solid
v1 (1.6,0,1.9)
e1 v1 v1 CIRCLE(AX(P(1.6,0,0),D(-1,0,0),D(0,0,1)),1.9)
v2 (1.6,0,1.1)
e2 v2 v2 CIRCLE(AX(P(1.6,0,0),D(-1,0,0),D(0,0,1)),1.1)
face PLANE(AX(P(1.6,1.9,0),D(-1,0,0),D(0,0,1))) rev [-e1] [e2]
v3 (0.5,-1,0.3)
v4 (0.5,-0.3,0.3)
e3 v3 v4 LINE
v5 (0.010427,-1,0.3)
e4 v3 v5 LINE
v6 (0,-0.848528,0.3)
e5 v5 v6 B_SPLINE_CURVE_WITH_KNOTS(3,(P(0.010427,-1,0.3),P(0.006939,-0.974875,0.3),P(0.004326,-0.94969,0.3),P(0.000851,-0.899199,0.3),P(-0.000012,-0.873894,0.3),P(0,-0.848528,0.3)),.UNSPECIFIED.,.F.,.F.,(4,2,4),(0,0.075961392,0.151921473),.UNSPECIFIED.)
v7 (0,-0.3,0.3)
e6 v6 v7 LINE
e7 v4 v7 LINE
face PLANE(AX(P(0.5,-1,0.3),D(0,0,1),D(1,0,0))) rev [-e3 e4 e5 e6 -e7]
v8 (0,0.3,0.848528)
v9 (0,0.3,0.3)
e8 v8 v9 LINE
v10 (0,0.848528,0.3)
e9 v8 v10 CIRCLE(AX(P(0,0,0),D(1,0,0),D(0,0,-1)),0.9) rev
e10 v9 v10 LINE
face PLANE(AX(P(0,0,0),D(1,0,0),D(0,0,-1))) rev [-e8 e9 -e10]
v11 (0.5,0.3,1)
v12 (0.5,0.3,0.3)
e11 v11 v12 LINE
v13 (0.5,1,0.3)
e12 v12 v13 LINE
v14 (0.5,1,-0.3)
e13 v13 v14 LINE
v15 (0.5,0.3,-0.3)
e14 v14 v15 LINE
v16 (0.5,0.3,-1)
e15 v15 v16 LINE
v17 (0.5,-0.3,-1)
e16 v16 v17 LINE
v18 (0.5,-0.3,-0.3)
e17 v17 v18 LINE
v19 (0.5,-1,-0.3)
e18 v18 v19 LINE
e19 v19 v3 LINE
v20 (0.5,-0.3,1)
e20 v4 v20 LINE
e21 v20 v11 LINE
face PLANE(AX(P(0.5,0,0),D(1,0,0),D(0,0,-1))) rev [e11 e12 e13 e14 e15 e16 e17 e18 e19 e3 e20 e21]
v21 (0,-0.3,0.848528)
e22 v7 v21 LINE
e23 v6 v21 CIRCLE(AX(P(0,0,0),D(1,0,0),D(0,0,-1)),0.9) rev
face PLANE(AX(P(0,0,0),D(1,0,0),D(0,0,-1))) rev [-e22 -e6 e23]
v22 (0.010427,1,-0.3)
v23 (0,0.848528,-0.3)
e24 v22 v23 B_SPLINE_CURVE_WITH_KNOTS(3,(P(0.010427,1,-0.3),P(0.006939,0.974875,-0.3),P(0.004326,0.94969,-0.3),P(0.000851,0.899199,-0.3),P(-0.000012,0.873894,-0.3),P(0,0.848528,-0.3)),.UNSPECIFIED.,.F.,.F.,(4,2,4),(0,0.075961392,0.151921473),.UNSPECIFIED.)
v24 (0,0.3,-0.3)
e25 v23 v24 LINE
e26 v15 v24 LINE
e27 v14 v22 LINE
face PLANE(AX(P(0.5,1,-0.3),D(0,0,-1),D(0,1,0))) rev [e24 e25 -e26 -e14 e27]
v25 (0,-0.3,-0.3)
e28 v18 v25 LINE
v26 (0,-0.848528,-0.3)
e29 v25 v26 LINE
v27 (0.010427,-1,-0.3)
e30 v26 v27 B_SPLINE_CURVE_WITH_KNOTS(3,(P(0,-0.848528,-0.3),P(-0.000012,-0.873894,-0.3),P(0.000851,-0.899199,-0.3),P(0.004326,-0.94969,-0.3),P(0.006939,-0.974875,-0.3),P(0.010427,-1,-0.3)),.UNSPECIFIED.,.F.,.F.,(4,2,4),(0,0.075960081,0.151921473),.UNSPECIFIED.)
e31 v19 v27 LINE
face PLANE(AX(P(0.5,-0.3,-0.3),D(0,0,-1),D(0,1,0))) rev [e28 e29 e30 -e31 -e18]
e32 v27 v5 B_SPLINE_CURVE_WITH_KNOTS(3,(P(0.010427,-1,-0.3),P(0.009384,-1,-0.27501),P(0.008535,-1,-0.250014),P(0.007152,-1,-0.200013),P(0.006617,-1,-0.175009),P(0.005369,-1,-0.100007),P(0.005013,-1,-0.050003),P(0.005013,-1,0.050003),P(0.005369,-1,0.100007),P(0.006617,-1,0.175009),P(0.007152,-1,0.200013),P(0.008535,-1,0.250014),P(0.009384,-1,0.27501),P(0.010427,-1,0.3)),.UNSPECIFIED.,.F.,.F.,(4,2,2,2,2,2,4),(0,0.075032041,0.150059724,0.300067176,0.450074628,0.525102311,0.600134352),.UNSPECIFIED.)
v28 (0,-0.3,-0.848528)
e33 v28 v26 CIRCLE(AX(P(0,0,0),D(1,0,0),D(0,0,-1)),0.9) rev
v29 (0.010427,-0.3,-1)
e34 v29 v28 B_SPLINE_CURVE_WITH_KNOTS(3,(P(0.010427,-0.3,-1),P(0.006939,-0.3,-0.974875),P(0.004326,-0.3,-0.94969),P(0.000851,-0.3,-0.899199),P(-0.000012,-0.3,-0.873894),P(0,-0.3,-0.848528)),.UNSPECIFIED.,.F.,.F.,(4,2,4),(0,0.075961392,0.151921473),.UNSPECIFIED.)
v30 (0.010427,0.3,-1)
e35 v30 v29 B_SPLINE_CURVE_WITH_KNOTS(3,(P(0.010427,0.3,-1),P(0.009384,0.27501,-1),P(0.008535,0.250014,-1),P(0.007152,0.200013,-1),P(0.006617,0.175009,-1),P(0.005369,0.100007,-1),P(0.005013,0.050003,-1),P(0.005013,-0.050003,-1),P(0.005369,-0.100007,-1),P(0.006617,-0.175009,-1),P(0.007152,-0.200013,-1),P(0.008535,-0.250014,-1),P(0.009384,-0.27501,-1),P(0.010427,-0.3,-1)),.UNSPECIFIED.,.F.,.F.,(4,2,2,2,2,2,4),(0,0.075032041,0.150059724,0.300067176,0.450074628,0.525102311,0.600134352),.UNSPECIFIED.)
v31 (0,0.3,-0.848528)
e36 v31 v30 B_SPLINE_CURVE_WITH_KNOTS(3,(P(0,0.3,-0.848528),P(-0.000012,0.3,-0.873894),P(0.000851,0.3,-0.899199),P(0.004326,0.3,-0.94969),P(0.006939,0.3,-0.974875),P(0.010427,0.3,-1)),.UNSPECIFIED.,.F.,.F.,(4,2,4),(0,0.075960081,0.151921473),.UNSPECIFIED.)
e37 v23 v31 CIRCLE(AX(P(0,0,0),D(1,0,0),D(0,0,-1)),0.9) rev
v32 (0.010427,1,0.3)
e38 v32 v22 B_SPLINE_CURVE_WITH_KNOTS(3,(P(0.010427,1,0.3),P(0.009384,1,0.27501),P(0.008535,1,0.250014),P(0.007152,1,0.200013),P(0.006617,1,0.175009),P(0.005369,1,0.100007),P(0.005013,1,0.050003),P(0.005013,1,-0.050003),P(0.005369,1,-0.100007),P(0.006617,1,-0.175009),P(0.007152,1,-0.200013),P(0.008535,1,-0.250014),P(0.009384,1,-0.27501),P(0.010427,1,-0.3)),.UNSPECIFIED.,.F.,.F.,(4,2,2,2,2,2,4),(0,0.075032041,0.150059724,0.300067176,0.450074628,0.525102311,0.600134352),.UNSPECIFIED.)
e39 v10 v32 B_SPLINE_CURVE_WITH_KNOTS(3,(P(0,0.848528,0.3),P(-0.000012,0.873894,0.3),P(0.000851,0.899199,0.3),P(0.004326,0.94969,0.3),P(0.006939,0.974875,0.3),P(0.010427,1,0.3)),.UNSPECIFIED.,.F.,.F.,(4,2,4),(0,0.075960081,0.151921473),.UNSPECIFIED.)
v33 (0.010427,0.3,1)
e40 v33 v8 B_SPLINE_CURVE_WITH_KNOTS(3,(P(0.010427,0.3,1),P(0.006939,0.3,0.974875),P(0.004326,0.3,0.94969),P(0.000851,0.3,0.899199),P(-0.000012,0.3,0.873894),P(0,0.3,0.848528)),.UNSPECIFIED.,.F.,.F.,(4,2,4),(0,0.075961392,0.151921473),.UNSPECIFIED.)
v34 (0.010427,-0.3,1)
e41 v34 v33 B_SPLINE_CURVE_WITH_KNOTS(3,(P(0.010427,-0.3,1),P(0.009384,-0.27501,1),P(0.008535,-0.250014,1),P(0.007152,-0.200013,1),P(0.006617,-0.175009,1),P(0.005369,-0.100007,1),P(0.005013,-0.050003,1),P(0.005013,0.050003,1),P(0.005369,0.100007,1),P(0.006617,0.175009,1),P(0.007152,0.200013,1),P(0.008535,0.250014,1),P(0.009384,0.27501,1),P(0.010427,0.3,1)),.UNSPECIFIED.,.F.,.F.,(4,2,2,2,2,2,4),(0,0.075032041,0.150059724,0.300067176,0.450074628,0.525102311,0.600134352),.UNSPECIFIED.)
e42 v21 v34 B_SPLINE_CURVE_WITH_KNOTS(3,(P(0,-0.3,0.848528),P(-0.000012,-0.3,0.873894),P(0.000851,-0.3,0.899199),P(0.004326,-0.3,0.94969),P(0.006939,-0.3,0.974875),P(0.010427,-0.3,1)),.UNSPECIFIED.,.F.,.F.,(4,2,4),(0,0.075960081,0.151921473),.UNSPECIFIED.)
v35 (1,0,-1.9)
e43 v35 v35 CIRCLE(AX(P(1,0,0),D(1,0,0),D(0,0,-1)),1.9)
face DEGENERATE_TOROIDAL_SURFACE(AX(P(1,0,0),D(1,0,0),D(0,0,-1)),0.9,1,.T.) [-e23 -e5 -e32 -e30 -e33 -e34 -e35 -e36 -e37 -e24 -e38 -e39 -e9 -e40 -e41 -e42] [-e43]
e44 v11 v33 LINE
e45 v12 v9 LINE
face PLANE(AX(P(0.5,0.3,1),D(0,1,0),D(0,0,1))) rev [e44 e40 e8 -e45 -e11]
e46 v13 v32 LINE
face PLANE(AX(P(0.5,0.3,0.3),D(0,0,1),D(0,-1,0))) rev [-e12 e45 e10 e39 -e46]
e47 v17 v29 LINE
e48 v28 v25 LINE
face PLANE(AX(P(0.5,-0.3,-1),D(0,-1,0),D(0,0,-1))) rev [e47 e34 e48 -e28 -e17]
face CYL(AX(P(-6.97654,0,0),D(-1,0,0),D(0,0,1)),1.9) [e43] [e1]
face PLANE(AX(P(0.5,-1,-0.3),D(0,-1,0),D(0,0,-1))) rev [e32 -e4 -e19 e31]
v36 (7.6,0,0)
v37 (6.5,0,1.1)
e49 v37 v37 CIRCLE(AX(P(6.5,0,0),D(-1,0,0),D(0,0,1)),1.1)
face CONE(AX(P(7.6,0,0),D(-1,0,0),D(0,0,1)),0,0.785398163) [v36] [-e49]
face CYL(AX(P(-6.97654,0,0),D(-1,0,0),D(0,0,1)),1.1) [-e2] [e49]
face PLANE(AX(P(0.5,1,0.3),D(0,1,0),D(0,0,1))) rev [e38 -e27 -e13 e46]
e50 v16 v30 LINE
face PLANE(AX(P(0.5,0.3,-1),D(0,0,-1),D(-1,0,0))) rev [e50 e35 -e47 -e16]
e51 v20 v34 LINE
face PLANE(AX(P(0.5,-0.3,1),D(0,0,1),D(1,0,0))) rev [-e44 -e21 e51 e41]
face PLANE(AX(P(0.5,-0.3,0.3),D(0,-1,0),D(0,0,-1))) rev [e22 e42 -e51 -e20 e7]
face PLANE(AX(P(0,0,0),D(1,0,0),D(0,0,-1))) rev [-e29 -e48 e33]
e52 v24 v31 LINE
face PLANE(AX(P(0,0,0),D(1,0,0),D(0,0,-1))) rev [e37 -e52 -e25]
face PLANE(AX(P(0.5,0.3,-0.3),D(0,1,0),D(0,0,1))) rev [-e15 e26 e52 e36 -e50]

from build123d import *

# Parameters (mm, degrees)
CUT_EXTRUDE_1_DEPTH = 0.5
FILLET_1_R          = 1


with BuildPart() as part:
    # 草图1 → 旋转1 (revolve)
    with BuildSketch(Plane.XY, mode=Mode.PRIVATE) as revolve_1_sk:
        Polygon((0, 0), (0, 1.9), (1.6, 1.9), (1.6, 1.1), (6.5, 1.1), (7.6, 0), align=None)
    revolve(revolve_1_sk.sketch.rotate(Axis((-6.976540153, 0, 0), (1, 0, 0)), 90), axis=Axis((-6.976540153, 0, 0), (1, 0, 0)))

    # 草图2 → 切除-拉伸1 (cut)
    with BuildSketch(Plane.ZY):
        Polygon((-0.3, 0.3), (-1, 0.3), (-1, -0.3), (-0.3, -0.3), (-0.3, -1), (0.3, -1), (0.3, -0.3), (1, -0.3), (1, 0.3), (0.3, 0.3), (0.3, 1), (-0.3, 1), align=None)
    extrude(amount=-CUT_EXTRUDE_1_DEPTH, mode=Mode.SUBTRACT)

    # 圆角1
    # the kernel refuses this fillet: 1 mm, written as the material it takes off along each edge
    with BuildSketch(Plane(origin=(0, 0, 0), x_dir=(0, 0, 1), z_dir=(0, 1, 0))) as fillet_1_piece_1:
        with BuildLine():
            CenterArc((1.9 - FILLET_1_R, FILLET_1_R), FILLET_1_R, 270, 90)
            Line((1.9, FILLET_1_R), (1.9, 0))
            Line((1.9, 0), (1.9 - FILLET_1_R, 0))
        make_face()
    revolve(axis=Axis((0, 0, 0), (1, 0, 0)), mode=Mode.SUBTRACT)


solid = part.part
